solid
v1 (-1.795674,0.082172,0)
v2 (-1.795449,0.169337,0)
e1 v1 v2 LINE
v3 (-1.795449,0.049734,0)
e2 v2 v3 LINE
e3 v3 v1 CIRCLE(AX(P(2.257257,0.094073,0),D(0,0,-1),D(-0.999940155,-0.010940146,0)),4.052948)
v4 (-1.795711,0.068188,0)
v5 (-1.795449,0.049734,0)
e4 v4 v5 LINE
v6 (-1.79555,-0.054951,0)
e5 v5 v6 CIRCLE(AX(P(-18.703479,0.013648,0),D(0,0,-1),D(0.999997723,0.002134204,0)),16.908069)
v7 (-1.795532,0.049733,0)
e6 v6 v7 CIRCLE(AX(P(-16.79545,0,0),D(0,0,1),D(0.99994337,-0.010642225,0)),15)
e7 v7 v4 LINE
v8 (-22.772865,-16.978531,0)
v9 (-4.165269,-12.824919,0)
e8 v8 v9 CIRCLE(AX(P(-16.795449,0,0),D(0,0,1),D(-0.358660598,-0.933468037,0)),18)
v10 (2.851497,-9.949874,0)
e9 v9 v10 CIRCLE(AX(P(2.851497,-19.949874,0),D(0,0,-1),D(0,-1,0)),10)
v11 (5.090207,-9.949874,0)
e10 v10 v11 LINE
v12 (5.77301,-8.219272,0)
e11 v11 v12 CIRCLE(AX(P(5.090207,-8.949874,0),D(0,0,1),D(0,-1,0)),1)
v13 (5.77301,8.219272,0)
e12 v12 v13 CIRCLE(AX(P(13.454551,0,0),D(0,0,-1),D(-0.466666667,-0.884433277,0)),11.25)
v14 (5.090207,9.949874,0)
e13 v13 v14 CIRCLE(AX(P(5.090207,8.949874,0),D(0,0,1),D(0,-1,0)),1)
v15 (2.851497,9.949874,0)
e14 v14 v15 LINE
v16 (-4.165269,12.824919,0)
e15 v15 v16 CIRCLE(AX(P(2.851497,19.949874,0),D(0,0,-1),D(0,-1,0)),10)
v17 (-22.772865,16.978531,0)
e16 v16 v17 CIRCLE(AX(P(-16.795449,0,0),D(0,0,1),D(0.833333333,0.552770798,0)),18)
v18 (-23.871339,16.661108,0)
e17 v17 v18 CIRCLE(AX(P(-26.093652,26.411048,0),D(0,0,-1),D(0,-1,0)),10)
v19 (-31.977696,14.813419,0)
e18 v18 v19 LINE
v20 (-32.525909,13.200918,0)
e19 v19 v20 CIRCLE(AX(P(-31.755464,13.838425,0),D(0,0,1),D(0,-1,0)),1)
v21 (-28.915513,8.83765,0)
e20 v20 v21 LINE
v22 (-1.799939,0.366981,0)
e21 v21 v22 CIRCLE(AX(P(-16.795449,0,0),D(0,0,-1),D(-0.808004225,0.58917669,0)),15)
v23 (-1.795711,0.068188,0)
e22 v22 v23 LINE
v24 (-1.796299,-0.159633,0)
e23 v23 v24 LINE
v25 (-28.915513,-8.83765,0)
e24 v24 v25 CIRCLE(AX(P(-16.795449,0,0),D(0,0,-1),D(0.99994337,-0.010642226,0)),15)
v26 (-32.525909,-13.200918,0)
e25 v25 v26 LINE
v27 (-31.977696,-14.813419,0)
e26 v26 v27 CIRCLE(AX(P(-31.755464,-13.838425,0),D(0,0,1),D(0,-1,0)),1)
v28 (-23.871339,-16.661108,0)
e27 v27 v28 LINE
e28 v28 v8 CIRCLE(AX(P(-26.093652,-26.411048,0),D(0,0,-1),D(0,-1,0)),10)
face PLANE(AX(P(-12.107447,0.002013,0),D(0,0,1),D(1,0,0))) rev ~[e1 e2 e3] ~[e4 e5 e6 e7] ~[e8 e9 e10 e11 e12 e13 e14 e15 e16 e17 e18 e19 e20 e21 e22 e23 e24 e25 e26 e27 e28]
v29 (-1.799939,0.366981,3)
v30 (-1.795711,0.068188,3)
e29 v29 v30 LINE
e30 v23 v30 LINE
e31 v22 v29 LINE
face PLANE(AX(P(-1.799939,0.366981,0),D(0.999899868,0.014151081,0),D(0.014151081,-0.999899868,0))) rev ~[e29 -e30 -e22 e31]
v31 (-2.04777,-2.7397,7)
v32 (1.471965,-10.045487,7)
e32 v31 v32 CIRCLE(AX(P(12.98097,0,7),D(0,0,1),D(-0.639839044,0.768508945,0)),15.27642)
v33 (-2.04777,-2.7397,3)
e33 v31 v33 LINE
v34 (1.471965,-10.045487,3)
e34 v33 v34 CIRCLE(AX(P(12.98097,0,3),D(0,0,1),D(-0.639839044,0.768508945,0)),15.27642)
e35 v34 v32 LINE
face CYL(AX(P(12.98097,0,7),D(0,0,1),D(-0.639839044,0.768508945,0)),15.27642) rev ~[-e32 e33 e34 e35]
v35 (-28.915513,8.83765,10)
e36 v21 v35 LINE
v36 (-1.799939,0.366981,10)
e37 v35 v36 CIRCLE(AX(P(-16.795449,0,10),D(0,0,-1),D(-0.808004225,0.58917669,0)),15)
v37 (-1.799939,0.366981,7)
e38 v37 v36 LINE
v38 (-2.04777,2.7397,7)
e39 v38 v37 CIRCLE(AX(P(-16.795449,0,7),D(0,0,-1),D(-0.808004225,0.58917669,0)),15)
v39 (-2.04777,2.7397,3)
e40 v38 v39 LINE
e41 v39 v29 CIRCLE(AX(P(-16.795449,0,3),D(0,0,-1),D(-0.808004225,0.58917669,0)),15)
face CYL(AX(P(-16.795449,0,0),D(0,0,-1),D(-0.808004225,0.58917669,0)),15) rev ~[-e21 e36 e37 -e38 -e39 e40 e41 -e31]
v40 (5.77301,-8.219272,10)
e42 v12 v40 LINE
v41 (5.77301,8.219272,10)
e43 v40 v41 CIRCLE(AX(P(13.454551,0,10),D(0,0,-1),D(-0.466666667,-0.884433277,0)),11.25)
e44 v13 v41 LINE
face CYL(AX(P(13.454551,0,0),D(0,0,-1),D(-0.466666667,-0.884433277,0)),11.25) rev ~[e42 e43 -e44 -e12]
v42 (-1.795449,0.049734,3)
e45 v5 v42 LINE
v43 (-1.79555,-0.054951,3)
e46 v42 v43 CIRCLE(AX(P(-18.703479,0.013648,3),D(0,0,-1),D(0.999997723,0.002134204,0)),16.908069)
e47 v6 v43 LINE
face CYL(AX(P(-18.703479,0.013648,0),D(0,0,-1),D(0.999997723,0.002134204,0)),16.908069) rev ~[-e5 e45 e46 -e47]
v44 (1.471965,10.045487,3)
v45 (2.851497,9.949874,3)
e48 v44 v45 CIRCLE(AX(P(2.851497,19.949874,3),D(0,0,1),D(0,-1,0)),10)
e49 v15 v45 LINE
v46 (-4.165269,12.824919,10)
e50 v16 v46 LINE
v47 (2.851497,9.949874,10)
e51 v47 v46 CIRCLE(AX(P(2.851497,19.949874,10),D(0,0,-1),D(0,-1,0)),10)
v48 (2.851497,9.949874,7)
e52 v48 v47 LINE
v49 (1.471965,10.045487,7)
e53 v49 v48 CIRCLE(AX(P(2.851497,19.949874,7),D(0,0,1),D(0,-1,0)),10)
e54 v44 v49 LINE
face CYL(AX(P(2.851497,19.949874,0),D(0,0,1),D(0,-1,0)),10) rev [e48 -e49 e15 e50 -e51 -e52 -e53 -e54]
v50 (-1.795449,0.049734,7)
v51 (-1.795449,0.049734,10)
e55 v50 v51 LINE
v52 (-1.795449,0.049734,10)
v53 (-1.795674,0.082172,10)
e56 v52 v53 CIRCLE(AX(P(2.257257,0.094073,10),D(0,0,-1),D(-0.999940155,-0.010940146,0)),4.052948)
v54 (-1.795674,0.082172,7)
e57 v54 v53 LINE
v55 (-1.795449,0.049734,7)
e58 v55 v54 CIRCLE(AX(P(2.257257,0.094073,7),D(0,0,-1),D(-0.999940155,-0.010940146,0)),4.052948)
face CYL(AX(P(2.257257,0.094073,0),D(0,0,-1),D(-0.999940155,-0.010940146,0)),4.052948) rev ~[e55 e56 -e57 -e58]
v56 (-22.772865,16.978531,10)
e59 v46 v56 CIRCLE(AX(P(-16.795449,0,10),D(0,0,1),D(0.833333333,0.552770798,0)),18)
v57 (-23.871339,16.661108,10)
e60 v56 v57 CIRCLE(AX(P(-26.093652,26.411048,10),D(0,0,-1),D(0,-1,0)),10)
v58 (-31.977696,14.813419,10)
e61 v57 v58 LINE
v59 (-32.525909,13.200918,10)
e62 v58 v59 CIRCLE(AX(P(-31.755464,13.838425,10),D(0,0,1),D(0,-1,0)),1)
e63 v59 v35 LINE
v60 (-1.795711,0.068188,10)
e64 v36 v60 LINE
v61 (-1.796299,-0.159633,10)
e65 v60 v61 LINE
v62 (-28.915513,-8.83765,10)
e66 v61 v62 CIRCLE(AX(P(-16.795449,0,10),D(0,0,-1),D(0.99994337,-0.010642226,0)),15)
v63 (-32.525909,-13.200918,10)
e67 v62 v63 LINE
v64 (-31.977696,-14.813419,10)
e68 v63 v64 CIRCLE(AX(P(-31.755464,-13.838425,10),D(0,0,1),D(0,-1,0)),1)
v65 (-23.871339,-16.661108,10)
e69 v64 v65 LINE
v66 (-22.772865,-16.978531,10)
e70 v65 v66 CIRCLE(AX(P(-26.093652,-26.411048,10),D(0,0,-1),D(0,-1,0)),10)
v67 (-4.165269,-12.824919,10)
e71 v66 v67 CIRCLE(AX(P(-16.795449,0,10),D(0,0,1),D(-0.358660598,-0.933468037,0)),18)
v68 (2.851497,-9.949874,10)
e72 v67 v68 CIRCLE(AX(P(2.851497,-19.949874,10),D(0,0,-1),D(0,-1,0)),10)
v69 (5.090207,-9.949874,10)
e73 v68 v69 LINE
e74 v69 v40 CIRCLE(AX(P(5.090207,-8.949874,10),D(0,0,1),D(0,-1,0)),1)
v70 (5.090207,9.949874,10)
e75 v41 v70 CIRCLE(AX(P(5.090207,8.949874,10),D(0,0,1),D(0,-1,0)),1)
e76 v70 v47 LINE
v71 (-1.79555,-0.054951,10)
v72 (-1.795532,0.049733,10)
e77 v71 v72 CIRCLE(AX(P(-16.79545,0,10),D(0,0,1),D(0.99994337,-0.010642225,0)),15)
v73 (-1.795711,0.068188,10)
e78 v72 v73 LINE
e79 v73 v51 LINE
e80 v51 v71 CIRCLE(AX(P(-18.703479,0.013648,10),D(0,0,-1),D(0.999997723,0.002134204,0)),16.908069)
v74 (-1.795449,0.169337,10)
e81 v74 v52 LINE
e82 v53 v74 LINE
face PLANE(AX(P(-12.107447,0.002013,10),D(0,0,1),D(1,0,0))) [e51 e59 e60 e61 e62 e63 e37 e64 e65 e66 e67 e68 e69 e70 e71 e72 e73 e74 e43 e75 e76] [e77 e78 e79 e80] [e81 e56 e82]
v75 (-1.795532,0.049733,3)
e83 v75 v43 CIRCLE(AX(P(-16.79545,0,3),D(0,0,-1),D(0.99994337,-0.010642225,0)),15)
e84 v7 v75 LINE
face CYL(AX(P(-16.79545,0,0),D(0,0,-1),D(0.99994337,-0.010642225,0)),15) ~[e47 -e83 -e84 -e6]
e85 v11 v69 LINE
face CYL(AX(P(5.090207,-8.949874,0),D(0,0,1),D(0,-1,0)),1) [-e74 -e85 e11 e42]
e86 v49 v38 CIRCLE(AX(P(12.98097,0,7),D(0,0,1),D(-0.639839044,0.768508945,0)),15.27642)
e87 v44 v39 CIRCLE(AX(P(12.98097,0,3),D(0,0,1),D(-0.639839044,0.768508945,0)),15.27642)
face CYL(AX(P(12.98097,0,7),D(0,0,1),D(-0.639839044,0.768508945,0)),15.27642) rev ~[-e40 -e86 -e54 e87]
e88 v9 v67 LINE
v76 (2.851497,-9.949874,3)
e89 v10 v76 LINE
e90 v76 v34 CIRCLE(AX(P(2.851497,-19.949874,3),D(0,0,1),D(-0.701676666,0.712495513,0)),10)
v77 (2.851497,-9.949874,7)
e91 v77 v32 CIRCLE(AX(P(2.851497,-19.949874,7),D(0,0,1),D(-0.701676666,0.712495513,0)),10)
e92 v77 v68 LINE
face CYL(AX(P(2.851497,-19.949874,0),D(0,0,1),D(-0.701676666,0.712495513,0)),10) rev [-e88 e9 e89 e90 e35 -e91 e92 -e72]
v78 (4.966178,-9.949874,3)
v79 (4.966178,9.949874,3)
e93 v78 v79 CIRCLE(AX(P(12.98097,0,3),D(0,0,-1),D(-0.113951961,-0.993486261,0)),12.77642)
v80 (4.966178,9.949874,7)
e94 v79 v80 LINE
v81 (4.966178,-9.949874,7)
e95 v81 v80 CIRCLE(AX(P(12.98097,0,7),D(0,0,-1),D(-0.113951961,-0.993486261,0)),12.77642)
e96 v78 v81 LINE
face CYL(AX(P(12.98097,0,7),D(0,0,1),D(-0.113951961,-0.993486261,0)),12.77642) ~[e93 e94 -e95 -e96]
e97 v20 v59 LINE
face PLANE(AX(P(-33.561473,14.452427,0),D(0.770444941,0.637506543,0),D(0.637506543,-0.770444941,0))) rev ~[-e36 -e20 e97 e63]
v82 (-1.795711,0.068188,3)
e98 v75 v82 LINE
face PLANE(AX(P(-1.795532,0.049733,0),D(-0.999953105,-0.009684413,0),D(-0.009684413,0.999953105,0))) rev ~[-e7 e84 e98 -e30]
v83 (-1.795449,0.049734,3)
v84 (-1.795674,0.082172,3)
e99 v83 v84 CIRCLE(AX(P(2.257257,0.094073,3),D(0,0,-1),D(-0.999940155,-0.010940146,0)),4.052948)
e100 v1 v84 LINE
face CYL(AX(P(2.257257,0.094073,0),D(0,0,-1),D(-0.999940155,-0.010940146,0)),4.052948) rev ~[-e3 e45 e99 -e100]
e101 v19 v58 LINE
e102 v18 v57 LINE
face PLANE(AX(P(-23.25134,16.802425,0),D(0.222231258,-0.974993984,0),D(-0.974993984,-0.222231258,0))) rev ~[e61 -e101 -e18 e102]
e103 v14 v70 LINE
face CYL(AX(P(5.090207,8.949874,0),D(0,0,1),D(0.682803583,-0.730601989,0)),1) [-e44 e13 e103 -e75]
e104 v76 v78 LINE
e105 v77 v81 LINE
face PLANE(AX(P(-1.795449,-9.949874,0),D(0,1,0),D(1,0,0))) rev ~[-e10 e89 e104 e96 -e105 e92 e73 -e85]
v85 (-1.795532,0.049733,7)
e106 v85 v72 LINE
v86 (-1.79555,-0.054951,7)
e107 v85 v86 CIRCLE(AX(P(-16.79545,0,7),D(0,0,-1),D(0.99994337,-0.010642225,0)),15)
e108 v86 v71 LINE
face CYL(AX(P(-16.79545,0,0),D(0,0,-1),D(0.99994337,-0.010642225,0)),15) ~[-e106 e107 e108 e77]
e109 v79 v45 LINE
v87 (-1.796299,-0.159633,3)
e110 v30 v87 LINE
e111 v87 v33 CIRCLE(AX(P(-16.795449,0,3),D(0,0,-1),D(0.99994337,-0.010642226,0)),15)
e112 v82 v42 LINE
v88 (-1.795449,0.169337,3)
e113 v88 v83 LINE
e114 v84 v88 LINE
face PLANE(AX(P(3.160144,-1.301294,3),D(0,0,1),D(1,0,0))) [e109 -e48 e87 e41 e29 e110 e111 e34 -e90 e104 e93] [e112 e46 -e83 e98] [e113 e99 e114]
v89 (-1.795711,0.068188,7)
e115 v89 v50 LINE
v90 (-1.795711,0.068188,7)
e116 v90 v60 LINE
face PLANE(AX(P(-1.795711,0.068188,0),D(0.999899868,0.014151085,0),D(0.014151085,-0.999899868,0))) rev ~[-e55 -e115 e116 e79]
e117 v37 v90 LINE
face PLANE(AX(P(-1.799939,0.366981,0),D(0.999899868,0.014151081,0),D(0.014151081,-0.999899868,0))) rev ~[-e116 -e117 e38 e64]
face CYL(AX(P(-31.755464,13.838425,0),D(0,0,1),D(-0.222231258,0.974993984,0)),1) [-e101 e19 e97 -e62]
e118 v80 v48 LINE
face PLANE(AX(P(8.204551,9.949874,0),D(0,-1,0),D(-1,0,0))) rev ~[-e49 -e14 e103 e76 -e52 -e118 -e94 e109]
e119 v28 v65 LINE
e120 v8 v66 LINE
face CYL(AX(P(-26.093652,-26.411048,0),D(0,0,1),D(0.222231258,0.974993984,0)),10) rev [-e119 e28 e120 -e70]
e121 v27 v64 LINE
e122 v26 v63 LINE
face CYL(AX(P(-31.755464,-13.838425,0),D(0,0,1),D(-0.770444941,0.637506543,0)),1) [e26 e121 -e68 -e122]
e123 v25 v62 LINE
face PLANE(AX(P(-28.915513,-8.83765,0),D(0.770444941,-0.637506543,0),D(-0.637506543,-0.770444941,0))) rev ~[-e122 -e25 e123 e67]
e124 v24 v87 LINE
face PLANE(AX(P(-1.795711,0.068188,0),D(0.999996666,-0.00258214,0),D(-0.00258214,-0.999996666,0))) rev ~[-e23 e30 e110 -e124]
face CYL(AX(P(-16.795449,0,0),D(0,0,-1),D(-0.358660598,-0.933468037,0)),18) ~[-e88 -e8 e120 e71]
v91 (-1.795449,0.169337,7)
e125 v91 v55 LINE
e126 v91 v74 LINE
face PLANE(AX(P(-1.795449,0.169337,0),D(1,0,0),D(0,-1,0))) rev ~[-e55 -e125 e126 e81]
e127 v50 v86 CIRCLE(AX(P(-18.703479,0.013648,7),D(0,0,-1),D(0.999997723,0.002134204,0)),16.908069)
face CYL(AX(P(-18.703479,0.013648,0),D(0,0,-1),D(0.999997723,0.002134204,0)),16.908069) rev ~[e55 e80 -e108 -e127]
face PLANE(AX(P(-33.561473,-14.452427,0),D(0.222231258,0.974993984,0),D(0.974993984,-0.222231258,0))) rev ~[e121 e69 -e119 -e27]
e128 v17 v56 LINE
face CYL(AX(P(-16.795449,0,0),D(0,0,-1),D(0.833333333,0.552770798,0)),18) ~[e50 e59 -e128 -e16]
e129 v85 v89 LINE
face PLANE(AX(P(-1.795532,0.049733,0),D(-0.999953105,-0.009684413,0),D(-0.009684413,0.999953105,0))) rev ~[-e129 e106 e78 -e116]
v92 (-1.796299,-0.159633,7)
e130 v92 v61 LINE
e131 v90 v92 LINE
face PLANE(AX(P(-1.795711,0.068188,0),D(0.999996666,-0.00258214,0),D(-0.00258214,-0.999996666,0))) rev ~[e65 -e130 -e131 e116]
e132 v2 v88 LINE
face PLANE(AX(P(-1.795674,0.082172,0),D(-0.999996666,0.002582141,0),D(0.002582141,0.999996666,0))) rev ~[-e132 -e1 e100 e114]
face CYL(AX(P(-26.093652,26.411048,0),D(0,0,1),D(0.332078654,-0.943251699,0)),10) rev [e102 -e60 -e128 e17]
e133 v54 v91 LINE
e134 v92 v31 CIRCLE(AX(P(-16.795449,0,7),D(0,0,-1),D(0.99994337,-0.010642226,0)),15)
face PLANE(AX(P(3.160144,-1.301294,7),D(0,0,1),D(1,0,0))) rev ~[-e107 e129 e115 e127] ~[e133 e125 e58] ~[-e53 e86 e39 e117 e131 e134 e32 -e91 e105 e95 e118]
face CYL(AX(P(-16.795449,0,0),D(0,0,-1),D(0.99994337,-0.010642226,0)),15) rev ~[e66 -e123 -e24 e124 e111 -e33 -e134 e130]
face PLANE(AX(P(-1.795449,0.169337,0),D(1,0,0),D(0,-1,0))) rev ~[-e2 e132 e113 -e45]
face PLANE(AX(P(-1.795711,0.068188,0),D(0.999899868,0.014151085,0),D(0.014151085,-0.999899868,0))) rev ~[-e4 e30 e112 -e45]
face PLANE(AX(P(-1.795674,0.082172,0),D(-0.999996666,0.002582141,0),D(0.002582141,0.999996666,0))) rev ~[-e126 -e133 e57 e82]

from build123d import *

# Parameters (mm, degrees)
F1_DEPTH = 10
F2_R     = 1
F3_R     = 10
F6_DEPTH = 4
F7_R     = 1


# Not quite as in the source:
# - ends of sketch curves that miss each other by under 0.0002 mm in the source are joined
# - a feature names something its author has since deleted; it is built from what else it names


with BuildPart() as f1:
    # F0 (on Top) → F1 (new body)
    with BuildSketch(Plane.XY):
        with BuildLine():
            ThreePointArc((-1.7962988307, -0.1596333839), (-12.2238763072, -14.2863823148), (-28.9155127569, -8.8376503509))
            Line((-28.9155127569, -8.8376503509), (-33.5614731624, -14.4524267481))
            Line((-33.5614731624, -14.4524267481), (-23.2513401401, -16.8024246609))
            ThreePointArc((-23.2513401401, -16.8024246609), (-11.3191539124, -17.1467252838), (-1.7954493794, -9.9498743711))
            Line((-1.7954493794, -9.9498743711), (8.2045506206, -9.9498743711))
            ThreePointArc((8.2045506206, -9.9498743711), (2.2045506206, 0), (8.2045506206, 9.9498743711))
            Line((8.2045506206, 9.9498743711), (-1.7954493794, 9.9498743711))
            ThreePointArc((-1.7954493794, 9.9498743711), (-11.3191539124, 17.1467252838), (-23.2513401401, 16.8024246609))
            Line((-23.2513401401, 16.8024246609), (-33.5614731624, 14.4524267481))
            Line((-33.5614731624, 14.4524267481), (-28.9155127569, 8.8376503509))
            ThreePointArc((-28.9155127569, 8.8376503509), (-12.3227425268, 14.3176427323), (-1.79993923, 0.3669814152))
            ThreePointArc((-1.79993923, 0.3669814152), (-1.7971307794, 0.2245866702), (-1.7956744539, 0.0821716783))
            Line((-1.7956744539, 0.0821716783), (-1.7954493794, 0.1693372455))
            Line((-1.7954493794, 0.1693372455), (-1.7954493794, 0.0497335093))
            ThreePointArc((-1.7954493794, 0.0497335093), (-1.795550035, -0.0549514122), (-1.7962988307, -0.1596333839))
        make_face()
        with BuildLine():
            Line((-1.7957105611, 0.0681883168), (-1.7962988307, -0.1596333839))
            ThreePointArc((-1.7962988307, -0.1596333839), (-1.795550035, -0.0549514122), (-1.7955318261, 0.049733236))
            Line((-1.7955318261, 0.049733236), (-1.7957105611, 0.0681883168))
        make_face()
        with BuildLine():
            Line((-1.7957105611, 0.0681883168), (-1.7954493794, 0.0497335093))
            ThreePointArc((-1.7954493794, 0.0497335093), (-1.7955943712, 0.0659524957), (-1.7956744539, 0.0821716783))
            Line((-1.7956744539, 0.0821716783), (-1.7957105611, 0.0681883168))
        make_face()
        with BuildLine():
            Line((-1.79993923, 0.3669814152), (-1.7957105611, 0.0681883168))
            Line((-1.7957105611, 0.0681883168), (-1.7956744539, 0.0821716783))
            ThreePointArc((-1.7956744539, 0.0821716783), (-1.7971307794, 0.2245866702), (-1.79993923, 0.3669814152))
        make_face()
    extrude(amount=F1_DEPTH)

    # F2
    f2_edges = [f1.edges().sort_by_distance(p)[0] for p in [
        (-33.561473, -14.452427, 5),
        (-33.561473, 14.452427, 5),
    ]]
    fillet(f2_edges, radius=F2_R)

    # F3
    f3_edges = [f1.edges().sort_by_distance(p)[0] for p in [
        (-1.795449, 9.949874, 5),
        (-1.795449, -9.949874, 5),
        (-23.25134, 16.802425, 5),
        (-23.25134, -16.802425, 5),
    ]]
    fillet(f3_edges, radius=F3_R)

    # F5 (on offset) → F6 (cut)
    with BuildSketch(Plane.XY.offset(7)):
        with BuildLine():
            ThreePointArc((11.5250723848, -12.6931975947), (0.3398769597, -1.8546317787), (7.9403583125, 11.740065307))
            Line((7.9403583125, 11.740065307), (3.2065206071, 11.740065307))
            ThreePointArc((3.2065206071, 11.740065307), (-2.2747136402, -0.7956794231), (4.4808682127, -12.6931975947))
            Line((4.4808682127, -12.6931975947), (11.5250723848, -12.6931975947))
        make_face()
    extrude(amount=-F6_DEPTH, mode=Mode.SUBTRACT)

    # F7
    f7_edges = [f1.edges().sort_by_distance(p)[0] for p in [
        (8.204551, 9.949874, 5),
        (8.204551, -9.949874, 5),
    ]]
    fillet(f7_edges, radius=F7_R)


solid = f1.part
